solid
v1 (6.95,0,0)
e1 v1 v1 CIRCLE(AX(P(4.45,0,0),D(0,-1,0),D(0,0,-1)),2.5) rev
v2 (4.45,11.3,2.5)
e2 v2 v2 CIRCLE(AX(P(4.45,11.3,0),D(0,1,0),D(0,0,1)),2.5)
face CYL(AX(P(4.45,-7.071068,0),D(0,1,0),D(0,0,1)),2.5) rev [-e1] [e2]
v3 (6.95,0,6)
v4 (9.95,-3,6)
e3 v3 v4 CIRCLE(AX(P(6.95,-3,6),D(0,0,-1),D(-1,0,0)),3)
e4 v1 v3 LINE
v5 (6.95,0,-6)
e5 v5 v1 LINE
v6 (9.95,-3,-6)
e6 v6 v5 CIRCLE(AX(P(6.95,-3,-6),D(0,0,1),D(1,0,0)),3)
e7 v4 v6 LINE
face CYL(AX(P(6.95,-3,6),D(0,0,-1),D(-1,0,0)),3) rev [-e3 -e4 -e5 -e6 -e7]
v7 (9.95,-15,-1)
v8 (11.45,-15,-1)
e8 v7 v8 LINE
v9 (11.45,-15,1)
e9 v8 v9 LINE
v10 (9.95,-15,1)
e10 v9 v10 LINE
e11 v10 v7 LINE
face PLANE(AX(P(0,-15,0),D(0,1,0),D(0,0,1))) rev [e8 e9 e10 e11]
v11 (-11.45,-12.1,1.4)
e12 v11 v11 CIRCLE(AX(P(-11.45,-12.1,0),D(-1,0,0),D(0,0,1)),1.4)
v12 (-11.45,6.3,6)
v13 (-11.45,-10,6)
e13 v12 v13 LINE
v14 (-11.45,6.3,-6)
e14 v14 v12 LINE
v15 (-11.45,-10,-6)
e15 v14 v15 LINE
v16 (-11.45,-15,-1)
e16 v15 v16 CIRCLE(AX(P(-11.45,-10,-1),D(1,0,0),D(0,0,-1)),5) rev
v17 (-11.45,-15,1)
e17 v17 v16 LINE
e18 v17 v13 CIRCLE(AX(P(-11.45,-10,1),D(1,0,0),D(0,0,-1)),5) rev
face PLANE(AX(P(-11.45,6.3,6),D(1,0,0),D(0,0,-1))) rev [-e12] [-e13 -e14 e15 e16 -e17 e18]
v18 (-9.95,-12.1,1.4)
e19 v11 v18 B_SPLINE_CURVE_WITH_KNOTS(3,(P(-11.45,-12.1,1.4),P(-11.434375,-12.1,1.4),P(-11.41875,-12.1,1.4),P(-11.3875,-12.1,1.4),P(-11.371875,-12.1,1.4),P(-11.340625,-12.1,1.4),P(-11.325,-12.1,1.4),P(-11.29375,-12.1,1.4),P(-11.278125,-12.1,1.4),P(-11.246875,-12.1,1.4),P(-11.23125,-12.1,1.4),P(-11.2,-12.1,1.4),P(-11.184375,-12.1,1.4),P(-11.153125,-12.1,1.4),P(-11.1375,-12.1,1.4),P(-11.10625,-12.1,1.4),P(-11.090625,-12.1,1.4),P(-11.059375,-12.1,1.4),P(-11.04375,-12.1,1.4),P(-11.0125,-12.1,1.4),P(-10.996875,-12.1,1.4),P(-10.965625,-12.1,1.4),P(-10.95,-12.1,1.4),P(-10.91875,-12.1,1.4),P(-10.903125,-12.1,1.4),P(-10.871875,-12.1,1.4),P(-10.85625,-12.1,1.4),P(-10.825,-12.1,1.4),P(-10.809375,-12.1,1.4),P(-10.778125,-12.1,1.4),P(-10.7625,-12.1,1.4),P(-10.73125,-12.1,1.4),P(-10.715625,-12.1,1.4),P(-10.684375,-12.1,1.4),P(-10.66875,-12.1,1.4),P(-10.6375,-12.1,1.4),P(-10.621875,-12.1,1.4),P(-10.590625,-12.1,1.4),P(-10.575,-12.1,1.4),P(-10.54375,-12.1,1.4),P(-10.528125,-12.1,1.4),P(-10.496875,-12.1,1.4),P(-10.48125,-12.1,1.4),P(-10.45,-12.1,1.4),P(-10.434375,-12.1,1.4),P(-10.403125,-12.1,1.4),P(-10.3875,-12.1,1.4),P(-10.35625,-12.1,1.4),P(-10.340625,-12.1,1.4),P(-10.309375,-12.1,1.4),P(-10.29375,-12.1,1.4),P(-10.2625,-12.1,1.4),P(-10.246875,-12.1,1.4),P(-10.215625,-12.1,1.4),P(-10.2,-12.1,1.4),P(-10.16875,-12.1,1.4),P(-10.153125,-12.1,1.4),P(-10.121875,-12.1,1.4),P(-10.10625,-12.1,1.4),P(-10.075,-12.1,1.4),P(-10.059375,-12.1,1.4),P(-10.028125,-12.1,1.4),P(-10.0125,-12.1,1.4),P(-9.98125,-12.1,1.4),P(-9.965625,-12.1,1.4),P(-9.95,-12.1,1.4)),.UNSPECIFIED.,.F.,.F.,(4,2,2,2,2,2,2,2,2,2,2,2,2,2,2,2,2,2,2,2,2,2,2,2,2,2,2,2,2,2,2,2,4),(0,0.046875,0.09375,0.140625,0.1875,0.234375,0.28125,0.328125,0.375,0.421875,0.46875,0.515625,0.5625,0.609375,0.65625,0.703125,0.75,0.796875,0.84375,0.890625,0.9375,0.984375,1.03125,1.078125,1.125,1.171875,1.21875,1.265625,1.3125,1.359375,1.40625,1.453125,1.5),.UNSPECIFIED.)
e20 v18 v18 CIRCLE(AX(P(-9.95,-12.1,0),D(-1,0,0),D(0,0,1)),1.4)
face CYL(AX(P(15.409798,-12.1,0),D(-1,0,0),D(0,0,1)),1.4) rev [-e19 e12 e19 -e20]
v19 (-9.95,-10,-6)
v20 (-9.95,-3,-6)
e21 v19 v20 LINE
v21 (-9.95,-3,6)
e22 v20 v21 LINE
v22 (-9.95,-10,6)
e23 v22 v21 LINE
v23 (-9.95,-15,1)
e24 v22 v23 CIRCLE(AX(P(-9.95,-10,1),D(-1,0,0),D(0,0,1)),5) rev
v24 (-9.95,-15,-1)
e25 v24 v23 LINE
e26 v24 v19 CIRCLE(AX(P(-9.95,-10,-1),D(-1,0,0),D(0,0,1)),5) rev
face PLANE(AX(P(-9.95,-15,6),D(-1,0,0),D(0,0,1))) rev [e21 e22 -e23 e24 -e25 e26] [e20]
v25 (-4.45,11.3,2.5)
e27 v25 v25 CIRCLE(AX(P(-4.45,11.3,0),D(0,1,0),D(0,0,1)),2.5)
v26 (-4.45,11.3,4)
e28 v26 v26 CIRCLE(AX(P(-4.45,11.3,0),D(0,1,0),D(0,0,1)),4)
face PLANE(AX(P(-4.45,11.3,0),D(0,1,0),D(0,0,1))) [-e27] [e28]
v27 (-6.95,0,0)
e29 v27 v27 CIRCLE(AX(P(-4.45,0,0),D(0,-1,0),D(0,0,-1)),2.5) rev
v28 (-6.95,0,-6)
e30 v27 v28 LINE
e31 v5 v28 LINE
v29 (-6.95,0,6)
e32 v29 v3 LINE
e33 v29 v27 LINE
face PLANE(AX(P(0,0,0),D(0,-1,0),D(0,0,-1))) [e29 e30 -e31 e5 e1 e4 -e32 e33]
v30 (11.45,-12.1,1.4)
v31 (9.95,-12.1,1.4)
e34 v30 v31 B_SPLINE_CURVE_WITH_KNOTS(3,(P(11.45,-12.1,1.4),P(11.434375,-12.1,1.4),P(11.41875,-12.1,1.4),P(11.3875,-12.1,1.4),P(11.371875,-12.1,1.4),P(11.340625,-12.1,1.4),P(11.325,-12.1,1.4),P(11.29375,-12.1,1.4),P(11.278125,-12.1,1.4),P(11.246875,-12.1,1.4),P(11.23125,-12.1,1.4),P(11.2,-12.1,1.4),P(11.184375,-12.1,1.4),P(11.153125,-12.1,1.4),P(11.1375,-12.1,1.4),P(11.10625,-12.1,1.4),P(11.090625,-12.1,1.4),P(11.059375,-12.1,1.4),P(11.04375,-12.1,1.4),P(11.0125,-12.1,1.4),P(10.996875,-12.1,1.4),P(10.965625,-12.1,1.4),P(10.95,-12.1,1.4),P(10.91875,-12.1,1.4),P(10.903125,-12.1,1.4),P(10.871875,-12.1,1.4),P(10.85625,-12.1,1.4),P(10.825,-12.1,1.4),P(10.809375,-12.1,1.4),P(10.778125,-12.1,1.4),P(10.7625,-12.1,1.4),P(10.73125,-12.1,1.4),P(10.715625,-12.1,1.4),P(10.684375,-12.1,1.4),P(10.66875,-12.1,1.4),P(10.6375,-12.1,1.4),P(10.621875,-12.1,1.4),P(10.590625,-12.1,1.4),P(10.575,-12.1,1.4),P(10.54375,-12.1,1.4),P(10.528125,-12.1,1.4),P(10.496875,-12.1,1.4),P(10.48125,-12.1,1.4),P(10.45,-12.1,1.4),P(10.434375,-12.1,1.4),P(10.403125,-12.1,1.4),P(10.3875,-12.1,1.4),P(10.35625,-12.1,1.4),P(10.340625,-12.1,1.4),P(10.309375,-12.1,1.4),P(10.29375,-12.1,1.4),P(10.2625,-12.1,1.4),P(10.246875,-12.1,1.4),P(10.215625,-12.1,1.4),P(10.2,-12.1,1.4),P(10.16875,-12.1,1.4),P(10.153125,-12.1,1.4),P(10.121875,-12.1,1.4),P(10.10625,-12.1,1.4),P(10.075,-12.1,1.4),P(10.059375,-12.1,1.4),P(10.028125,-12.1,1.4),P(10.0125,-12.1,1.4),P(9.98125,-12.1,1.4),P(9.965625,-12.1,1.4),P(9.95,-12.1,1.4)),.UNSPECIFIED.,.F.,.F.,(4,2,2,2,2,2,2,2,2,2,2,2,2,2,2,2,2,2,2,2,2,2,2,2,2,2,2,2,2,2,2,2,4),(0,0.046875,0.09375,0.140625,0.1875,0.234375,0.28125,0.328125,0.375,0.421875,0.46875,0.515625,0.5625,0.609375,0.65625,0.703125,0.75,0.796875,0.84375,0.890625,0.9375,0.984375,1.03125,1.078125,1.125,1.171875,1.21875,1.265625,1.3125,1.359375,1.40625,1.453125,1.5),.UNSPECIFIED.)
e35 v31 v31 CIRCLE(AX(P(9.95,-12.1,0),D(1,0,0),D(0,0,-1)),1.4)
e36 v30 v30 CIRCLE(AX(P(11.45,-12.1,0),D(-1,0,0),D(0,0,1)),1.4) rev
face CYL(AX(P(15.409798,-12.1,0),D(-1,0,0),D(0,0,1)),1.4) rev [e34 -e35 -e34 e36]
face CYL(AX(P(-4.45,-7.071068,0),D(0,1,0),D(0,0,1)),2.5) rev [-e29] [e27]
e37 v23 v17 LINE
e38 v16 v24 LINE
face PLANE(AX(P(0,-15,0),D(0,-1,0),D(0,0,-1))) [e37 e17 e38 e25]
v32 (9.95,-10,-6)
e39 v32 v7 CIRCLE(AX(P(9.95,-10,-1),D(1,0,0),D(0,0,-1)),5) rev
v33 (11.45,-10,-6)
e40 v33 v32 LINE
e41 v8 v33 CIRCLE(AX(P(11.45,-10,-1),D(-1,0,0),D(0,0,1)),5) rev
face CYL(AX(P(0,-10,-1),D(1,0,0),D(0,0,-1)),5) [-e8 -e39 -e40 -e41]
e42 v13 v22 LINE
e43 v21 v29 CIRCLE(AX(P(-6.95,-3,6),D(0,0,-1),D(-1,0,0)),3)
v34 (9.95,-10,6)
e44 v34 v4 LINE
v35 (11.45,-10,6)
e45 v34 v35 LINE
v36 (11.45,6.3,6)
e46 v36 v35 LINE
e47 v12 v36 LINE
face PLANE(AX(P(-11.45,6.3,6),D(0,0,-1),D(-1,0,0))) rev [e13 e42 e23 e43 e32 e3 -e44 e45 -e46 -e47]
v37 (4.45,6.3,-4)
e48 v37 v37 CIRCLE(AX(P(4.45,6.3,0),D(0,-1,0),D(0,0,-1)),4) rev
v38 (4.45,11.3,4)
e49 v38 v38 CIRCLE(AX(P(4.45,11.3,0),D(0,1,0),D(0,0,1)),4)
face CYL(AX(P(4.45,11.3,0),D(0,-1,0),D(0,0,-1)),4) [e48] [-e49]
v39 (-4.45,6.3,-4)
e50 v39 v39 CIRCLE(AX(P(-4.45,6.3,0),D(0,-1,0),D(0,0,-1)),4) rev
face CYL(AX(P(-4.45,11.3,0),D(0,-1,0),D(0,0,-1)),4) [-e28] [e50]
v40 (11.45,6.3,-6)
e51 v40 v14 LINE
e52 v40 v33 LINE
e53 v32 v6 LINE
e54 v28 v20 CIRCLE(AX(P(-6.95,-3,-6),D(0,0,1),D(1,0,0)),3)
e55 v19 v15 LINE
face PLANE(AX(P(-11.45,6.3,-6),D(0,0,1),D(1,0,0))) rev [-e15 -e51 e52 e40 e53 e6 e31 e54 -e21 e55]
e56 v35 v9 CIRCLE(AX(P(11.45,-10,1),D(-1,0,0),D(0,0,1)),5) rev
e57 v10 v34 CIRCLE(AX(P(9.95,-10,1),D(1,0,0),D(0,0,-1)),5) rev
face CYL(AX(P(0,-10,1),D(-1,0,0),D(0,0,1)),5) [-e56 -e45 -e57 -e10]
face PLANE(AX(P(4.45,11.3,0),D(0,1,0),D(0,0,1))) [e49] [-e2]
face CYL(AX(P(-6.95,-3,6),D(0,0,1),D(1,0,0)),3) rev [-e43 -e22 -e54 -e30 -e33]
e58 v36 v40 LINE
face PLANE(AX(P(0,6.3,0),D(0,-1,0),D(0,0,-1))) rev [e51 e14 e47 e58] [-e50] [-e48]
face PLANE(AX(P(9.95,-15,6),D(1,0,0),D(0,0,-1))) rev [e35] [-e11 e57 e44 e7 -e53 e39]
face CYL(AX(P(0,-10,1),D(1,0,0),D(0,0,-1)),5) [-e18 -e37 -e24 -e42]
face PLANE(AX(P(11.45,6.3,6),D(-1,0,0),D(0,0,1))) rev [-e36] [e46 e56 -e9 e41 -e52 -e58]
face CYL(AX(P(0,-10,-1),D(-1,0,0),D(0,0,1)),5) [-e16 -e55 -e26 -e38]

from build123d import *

# Parameters (mm, degrees)
BOSS_EXTRUDE1_OUTLINE_W = 22.9
BOSS_EXTRUDE1_OUTLINE_H = 12
BOSS_EXTRUDE1_DEPTH     = 6.3
SKETCH2_R               = 4
BOSS_EXTRUDE2_DEPTH     = 5
SKETCH3_R               = 2.5
CUT_EXTRUDE1_DEPTH      = 11.3
SKETCH4_W               = 1.5
SKETCH4_H               = 12
BOSS_EXTRUDE3_DEPTH     = 15
FILLET1_R               = 3
CUT_EXTRUDE2_REACH      = 30.025
SKETCH5_R               = 1.4
FILLET2_R               = 5


# Read off the part's stored shape, not the designer's step: Boss-Extrude1
with BuildPart() as part:
    # Boss-Extrude1 outline → Boss-Extrude1 (new body)
    with BuildSketch(Plane(origin=(0, 0, 0), x_dir=(1, 0, 0), z_dir=(0, 1, 0))):
        Rectangle(BOSS_EXTRUDE1_OUTLINE_W, BOSS_EXTRUDE1_OUTLINE_H)
    extrude(amount=BOSS_EXTRUDE1_DEPTH)

    # Sketch2 → Boss-Extrude2 (add)
    with BuildSketch(Plane(origin=(0, 6.3, 0), x_dir=(1, 0, 0), z_dir=(0, 1, 0))):
        with Locations(Location((-4.45, 0, 0), (0, 0, 90))):
            Circle(SKETCH2_R)
        with Locations(Location((4.45, 0, 0), (0, 0, 90))):
            Circle(SKETCH2_R)
    extrude(amount=BOSS_EXTRUDE2_DEPTH)

    # Sketch3 → Cut-Extrude1 (cut)
    with BuildSketch(Plane(origin=(0, 11.3, 0), x_dir=(1, 0, 0), z_dir=(0, 1, 0))):
        with Locations(Location((4.45, 0, 0), (0, 0, 270))):
            Circle(SKETCH3_R)
        with Locations(Location((-4.45, 0, 0), (0, 0, 270))):
            Circle(SKETCH3_R)
    extrude(amount=-CUT_EXTRUDE1_DEPTH, mode=Mode.SUBTRACT)

    # Sketch4 → Boss-Extrude3 (add)
    with BuildSketch(Plane.XZ):
        with Locations((-10.7, 0)):
            Rectangle(SKETCH4_W, SKETCH4_H)
        with Locations((10.7, 0)):
            Rectangle(SKETCH4_W, SKETCH4_H)
    extrude(amount=BOSS_EXTRUDE3_DEPTH)

    # Fillet1
    fillet1_edges = [part.edges().sort_by_distance(p)[0] for p in [
        (9.95, 0, 0),
        (-9.95, 0, 0),
    ]]
    fillet(fillet1_edges, radius=FILLET1_R - 0.0001)  # a hair under: the kernel refuses the full size

    # Cut-Extrude2: up to this face of the body (flat: up to its plane)
    cut_extrude2_end = Plane(part.part.faces().sort_by_distance((11.45, -4.35, 0))[0])
    # Sketch5 → Cut-Extrude2 (cut, up to the picked face)
    with BuildSketch(Plane.ZY.offset(11.45), mode=Mode.PRIVATE) as cut_extrude2_sk1:
        with Locations((0, -12.1)):
            Circle(SKETCH5_R)
    cut_extrude2_tool1 = split(extrude(cut_extrude2_sk1.sketch, amount=-CUT_EXTRUDE2_REACH, mode=Mode.PRIVATE), bisect_by=cut_extrude2_end, keep=Keep.BOTH, mode=Mode.PRIVATE)
    add(cut_extrude2_tool1.solids().sort_by(Axis((-11.45, -12.1, 0), (1, 0, 0)))[0], mode=Mode.SUBTRACT)

    # Fillet2
    fillet2_edges = [part.edges().sort_by_distance(p)[0] for p in [
        (-10.7, -15, -6),
        (-10.7, -15, 6),
        (10.7, -15, -6),
        (10.7, -15, 6),
    ]]
    fillet(fillet2_edges, radius=FILLET2_R)


solid = part.part
